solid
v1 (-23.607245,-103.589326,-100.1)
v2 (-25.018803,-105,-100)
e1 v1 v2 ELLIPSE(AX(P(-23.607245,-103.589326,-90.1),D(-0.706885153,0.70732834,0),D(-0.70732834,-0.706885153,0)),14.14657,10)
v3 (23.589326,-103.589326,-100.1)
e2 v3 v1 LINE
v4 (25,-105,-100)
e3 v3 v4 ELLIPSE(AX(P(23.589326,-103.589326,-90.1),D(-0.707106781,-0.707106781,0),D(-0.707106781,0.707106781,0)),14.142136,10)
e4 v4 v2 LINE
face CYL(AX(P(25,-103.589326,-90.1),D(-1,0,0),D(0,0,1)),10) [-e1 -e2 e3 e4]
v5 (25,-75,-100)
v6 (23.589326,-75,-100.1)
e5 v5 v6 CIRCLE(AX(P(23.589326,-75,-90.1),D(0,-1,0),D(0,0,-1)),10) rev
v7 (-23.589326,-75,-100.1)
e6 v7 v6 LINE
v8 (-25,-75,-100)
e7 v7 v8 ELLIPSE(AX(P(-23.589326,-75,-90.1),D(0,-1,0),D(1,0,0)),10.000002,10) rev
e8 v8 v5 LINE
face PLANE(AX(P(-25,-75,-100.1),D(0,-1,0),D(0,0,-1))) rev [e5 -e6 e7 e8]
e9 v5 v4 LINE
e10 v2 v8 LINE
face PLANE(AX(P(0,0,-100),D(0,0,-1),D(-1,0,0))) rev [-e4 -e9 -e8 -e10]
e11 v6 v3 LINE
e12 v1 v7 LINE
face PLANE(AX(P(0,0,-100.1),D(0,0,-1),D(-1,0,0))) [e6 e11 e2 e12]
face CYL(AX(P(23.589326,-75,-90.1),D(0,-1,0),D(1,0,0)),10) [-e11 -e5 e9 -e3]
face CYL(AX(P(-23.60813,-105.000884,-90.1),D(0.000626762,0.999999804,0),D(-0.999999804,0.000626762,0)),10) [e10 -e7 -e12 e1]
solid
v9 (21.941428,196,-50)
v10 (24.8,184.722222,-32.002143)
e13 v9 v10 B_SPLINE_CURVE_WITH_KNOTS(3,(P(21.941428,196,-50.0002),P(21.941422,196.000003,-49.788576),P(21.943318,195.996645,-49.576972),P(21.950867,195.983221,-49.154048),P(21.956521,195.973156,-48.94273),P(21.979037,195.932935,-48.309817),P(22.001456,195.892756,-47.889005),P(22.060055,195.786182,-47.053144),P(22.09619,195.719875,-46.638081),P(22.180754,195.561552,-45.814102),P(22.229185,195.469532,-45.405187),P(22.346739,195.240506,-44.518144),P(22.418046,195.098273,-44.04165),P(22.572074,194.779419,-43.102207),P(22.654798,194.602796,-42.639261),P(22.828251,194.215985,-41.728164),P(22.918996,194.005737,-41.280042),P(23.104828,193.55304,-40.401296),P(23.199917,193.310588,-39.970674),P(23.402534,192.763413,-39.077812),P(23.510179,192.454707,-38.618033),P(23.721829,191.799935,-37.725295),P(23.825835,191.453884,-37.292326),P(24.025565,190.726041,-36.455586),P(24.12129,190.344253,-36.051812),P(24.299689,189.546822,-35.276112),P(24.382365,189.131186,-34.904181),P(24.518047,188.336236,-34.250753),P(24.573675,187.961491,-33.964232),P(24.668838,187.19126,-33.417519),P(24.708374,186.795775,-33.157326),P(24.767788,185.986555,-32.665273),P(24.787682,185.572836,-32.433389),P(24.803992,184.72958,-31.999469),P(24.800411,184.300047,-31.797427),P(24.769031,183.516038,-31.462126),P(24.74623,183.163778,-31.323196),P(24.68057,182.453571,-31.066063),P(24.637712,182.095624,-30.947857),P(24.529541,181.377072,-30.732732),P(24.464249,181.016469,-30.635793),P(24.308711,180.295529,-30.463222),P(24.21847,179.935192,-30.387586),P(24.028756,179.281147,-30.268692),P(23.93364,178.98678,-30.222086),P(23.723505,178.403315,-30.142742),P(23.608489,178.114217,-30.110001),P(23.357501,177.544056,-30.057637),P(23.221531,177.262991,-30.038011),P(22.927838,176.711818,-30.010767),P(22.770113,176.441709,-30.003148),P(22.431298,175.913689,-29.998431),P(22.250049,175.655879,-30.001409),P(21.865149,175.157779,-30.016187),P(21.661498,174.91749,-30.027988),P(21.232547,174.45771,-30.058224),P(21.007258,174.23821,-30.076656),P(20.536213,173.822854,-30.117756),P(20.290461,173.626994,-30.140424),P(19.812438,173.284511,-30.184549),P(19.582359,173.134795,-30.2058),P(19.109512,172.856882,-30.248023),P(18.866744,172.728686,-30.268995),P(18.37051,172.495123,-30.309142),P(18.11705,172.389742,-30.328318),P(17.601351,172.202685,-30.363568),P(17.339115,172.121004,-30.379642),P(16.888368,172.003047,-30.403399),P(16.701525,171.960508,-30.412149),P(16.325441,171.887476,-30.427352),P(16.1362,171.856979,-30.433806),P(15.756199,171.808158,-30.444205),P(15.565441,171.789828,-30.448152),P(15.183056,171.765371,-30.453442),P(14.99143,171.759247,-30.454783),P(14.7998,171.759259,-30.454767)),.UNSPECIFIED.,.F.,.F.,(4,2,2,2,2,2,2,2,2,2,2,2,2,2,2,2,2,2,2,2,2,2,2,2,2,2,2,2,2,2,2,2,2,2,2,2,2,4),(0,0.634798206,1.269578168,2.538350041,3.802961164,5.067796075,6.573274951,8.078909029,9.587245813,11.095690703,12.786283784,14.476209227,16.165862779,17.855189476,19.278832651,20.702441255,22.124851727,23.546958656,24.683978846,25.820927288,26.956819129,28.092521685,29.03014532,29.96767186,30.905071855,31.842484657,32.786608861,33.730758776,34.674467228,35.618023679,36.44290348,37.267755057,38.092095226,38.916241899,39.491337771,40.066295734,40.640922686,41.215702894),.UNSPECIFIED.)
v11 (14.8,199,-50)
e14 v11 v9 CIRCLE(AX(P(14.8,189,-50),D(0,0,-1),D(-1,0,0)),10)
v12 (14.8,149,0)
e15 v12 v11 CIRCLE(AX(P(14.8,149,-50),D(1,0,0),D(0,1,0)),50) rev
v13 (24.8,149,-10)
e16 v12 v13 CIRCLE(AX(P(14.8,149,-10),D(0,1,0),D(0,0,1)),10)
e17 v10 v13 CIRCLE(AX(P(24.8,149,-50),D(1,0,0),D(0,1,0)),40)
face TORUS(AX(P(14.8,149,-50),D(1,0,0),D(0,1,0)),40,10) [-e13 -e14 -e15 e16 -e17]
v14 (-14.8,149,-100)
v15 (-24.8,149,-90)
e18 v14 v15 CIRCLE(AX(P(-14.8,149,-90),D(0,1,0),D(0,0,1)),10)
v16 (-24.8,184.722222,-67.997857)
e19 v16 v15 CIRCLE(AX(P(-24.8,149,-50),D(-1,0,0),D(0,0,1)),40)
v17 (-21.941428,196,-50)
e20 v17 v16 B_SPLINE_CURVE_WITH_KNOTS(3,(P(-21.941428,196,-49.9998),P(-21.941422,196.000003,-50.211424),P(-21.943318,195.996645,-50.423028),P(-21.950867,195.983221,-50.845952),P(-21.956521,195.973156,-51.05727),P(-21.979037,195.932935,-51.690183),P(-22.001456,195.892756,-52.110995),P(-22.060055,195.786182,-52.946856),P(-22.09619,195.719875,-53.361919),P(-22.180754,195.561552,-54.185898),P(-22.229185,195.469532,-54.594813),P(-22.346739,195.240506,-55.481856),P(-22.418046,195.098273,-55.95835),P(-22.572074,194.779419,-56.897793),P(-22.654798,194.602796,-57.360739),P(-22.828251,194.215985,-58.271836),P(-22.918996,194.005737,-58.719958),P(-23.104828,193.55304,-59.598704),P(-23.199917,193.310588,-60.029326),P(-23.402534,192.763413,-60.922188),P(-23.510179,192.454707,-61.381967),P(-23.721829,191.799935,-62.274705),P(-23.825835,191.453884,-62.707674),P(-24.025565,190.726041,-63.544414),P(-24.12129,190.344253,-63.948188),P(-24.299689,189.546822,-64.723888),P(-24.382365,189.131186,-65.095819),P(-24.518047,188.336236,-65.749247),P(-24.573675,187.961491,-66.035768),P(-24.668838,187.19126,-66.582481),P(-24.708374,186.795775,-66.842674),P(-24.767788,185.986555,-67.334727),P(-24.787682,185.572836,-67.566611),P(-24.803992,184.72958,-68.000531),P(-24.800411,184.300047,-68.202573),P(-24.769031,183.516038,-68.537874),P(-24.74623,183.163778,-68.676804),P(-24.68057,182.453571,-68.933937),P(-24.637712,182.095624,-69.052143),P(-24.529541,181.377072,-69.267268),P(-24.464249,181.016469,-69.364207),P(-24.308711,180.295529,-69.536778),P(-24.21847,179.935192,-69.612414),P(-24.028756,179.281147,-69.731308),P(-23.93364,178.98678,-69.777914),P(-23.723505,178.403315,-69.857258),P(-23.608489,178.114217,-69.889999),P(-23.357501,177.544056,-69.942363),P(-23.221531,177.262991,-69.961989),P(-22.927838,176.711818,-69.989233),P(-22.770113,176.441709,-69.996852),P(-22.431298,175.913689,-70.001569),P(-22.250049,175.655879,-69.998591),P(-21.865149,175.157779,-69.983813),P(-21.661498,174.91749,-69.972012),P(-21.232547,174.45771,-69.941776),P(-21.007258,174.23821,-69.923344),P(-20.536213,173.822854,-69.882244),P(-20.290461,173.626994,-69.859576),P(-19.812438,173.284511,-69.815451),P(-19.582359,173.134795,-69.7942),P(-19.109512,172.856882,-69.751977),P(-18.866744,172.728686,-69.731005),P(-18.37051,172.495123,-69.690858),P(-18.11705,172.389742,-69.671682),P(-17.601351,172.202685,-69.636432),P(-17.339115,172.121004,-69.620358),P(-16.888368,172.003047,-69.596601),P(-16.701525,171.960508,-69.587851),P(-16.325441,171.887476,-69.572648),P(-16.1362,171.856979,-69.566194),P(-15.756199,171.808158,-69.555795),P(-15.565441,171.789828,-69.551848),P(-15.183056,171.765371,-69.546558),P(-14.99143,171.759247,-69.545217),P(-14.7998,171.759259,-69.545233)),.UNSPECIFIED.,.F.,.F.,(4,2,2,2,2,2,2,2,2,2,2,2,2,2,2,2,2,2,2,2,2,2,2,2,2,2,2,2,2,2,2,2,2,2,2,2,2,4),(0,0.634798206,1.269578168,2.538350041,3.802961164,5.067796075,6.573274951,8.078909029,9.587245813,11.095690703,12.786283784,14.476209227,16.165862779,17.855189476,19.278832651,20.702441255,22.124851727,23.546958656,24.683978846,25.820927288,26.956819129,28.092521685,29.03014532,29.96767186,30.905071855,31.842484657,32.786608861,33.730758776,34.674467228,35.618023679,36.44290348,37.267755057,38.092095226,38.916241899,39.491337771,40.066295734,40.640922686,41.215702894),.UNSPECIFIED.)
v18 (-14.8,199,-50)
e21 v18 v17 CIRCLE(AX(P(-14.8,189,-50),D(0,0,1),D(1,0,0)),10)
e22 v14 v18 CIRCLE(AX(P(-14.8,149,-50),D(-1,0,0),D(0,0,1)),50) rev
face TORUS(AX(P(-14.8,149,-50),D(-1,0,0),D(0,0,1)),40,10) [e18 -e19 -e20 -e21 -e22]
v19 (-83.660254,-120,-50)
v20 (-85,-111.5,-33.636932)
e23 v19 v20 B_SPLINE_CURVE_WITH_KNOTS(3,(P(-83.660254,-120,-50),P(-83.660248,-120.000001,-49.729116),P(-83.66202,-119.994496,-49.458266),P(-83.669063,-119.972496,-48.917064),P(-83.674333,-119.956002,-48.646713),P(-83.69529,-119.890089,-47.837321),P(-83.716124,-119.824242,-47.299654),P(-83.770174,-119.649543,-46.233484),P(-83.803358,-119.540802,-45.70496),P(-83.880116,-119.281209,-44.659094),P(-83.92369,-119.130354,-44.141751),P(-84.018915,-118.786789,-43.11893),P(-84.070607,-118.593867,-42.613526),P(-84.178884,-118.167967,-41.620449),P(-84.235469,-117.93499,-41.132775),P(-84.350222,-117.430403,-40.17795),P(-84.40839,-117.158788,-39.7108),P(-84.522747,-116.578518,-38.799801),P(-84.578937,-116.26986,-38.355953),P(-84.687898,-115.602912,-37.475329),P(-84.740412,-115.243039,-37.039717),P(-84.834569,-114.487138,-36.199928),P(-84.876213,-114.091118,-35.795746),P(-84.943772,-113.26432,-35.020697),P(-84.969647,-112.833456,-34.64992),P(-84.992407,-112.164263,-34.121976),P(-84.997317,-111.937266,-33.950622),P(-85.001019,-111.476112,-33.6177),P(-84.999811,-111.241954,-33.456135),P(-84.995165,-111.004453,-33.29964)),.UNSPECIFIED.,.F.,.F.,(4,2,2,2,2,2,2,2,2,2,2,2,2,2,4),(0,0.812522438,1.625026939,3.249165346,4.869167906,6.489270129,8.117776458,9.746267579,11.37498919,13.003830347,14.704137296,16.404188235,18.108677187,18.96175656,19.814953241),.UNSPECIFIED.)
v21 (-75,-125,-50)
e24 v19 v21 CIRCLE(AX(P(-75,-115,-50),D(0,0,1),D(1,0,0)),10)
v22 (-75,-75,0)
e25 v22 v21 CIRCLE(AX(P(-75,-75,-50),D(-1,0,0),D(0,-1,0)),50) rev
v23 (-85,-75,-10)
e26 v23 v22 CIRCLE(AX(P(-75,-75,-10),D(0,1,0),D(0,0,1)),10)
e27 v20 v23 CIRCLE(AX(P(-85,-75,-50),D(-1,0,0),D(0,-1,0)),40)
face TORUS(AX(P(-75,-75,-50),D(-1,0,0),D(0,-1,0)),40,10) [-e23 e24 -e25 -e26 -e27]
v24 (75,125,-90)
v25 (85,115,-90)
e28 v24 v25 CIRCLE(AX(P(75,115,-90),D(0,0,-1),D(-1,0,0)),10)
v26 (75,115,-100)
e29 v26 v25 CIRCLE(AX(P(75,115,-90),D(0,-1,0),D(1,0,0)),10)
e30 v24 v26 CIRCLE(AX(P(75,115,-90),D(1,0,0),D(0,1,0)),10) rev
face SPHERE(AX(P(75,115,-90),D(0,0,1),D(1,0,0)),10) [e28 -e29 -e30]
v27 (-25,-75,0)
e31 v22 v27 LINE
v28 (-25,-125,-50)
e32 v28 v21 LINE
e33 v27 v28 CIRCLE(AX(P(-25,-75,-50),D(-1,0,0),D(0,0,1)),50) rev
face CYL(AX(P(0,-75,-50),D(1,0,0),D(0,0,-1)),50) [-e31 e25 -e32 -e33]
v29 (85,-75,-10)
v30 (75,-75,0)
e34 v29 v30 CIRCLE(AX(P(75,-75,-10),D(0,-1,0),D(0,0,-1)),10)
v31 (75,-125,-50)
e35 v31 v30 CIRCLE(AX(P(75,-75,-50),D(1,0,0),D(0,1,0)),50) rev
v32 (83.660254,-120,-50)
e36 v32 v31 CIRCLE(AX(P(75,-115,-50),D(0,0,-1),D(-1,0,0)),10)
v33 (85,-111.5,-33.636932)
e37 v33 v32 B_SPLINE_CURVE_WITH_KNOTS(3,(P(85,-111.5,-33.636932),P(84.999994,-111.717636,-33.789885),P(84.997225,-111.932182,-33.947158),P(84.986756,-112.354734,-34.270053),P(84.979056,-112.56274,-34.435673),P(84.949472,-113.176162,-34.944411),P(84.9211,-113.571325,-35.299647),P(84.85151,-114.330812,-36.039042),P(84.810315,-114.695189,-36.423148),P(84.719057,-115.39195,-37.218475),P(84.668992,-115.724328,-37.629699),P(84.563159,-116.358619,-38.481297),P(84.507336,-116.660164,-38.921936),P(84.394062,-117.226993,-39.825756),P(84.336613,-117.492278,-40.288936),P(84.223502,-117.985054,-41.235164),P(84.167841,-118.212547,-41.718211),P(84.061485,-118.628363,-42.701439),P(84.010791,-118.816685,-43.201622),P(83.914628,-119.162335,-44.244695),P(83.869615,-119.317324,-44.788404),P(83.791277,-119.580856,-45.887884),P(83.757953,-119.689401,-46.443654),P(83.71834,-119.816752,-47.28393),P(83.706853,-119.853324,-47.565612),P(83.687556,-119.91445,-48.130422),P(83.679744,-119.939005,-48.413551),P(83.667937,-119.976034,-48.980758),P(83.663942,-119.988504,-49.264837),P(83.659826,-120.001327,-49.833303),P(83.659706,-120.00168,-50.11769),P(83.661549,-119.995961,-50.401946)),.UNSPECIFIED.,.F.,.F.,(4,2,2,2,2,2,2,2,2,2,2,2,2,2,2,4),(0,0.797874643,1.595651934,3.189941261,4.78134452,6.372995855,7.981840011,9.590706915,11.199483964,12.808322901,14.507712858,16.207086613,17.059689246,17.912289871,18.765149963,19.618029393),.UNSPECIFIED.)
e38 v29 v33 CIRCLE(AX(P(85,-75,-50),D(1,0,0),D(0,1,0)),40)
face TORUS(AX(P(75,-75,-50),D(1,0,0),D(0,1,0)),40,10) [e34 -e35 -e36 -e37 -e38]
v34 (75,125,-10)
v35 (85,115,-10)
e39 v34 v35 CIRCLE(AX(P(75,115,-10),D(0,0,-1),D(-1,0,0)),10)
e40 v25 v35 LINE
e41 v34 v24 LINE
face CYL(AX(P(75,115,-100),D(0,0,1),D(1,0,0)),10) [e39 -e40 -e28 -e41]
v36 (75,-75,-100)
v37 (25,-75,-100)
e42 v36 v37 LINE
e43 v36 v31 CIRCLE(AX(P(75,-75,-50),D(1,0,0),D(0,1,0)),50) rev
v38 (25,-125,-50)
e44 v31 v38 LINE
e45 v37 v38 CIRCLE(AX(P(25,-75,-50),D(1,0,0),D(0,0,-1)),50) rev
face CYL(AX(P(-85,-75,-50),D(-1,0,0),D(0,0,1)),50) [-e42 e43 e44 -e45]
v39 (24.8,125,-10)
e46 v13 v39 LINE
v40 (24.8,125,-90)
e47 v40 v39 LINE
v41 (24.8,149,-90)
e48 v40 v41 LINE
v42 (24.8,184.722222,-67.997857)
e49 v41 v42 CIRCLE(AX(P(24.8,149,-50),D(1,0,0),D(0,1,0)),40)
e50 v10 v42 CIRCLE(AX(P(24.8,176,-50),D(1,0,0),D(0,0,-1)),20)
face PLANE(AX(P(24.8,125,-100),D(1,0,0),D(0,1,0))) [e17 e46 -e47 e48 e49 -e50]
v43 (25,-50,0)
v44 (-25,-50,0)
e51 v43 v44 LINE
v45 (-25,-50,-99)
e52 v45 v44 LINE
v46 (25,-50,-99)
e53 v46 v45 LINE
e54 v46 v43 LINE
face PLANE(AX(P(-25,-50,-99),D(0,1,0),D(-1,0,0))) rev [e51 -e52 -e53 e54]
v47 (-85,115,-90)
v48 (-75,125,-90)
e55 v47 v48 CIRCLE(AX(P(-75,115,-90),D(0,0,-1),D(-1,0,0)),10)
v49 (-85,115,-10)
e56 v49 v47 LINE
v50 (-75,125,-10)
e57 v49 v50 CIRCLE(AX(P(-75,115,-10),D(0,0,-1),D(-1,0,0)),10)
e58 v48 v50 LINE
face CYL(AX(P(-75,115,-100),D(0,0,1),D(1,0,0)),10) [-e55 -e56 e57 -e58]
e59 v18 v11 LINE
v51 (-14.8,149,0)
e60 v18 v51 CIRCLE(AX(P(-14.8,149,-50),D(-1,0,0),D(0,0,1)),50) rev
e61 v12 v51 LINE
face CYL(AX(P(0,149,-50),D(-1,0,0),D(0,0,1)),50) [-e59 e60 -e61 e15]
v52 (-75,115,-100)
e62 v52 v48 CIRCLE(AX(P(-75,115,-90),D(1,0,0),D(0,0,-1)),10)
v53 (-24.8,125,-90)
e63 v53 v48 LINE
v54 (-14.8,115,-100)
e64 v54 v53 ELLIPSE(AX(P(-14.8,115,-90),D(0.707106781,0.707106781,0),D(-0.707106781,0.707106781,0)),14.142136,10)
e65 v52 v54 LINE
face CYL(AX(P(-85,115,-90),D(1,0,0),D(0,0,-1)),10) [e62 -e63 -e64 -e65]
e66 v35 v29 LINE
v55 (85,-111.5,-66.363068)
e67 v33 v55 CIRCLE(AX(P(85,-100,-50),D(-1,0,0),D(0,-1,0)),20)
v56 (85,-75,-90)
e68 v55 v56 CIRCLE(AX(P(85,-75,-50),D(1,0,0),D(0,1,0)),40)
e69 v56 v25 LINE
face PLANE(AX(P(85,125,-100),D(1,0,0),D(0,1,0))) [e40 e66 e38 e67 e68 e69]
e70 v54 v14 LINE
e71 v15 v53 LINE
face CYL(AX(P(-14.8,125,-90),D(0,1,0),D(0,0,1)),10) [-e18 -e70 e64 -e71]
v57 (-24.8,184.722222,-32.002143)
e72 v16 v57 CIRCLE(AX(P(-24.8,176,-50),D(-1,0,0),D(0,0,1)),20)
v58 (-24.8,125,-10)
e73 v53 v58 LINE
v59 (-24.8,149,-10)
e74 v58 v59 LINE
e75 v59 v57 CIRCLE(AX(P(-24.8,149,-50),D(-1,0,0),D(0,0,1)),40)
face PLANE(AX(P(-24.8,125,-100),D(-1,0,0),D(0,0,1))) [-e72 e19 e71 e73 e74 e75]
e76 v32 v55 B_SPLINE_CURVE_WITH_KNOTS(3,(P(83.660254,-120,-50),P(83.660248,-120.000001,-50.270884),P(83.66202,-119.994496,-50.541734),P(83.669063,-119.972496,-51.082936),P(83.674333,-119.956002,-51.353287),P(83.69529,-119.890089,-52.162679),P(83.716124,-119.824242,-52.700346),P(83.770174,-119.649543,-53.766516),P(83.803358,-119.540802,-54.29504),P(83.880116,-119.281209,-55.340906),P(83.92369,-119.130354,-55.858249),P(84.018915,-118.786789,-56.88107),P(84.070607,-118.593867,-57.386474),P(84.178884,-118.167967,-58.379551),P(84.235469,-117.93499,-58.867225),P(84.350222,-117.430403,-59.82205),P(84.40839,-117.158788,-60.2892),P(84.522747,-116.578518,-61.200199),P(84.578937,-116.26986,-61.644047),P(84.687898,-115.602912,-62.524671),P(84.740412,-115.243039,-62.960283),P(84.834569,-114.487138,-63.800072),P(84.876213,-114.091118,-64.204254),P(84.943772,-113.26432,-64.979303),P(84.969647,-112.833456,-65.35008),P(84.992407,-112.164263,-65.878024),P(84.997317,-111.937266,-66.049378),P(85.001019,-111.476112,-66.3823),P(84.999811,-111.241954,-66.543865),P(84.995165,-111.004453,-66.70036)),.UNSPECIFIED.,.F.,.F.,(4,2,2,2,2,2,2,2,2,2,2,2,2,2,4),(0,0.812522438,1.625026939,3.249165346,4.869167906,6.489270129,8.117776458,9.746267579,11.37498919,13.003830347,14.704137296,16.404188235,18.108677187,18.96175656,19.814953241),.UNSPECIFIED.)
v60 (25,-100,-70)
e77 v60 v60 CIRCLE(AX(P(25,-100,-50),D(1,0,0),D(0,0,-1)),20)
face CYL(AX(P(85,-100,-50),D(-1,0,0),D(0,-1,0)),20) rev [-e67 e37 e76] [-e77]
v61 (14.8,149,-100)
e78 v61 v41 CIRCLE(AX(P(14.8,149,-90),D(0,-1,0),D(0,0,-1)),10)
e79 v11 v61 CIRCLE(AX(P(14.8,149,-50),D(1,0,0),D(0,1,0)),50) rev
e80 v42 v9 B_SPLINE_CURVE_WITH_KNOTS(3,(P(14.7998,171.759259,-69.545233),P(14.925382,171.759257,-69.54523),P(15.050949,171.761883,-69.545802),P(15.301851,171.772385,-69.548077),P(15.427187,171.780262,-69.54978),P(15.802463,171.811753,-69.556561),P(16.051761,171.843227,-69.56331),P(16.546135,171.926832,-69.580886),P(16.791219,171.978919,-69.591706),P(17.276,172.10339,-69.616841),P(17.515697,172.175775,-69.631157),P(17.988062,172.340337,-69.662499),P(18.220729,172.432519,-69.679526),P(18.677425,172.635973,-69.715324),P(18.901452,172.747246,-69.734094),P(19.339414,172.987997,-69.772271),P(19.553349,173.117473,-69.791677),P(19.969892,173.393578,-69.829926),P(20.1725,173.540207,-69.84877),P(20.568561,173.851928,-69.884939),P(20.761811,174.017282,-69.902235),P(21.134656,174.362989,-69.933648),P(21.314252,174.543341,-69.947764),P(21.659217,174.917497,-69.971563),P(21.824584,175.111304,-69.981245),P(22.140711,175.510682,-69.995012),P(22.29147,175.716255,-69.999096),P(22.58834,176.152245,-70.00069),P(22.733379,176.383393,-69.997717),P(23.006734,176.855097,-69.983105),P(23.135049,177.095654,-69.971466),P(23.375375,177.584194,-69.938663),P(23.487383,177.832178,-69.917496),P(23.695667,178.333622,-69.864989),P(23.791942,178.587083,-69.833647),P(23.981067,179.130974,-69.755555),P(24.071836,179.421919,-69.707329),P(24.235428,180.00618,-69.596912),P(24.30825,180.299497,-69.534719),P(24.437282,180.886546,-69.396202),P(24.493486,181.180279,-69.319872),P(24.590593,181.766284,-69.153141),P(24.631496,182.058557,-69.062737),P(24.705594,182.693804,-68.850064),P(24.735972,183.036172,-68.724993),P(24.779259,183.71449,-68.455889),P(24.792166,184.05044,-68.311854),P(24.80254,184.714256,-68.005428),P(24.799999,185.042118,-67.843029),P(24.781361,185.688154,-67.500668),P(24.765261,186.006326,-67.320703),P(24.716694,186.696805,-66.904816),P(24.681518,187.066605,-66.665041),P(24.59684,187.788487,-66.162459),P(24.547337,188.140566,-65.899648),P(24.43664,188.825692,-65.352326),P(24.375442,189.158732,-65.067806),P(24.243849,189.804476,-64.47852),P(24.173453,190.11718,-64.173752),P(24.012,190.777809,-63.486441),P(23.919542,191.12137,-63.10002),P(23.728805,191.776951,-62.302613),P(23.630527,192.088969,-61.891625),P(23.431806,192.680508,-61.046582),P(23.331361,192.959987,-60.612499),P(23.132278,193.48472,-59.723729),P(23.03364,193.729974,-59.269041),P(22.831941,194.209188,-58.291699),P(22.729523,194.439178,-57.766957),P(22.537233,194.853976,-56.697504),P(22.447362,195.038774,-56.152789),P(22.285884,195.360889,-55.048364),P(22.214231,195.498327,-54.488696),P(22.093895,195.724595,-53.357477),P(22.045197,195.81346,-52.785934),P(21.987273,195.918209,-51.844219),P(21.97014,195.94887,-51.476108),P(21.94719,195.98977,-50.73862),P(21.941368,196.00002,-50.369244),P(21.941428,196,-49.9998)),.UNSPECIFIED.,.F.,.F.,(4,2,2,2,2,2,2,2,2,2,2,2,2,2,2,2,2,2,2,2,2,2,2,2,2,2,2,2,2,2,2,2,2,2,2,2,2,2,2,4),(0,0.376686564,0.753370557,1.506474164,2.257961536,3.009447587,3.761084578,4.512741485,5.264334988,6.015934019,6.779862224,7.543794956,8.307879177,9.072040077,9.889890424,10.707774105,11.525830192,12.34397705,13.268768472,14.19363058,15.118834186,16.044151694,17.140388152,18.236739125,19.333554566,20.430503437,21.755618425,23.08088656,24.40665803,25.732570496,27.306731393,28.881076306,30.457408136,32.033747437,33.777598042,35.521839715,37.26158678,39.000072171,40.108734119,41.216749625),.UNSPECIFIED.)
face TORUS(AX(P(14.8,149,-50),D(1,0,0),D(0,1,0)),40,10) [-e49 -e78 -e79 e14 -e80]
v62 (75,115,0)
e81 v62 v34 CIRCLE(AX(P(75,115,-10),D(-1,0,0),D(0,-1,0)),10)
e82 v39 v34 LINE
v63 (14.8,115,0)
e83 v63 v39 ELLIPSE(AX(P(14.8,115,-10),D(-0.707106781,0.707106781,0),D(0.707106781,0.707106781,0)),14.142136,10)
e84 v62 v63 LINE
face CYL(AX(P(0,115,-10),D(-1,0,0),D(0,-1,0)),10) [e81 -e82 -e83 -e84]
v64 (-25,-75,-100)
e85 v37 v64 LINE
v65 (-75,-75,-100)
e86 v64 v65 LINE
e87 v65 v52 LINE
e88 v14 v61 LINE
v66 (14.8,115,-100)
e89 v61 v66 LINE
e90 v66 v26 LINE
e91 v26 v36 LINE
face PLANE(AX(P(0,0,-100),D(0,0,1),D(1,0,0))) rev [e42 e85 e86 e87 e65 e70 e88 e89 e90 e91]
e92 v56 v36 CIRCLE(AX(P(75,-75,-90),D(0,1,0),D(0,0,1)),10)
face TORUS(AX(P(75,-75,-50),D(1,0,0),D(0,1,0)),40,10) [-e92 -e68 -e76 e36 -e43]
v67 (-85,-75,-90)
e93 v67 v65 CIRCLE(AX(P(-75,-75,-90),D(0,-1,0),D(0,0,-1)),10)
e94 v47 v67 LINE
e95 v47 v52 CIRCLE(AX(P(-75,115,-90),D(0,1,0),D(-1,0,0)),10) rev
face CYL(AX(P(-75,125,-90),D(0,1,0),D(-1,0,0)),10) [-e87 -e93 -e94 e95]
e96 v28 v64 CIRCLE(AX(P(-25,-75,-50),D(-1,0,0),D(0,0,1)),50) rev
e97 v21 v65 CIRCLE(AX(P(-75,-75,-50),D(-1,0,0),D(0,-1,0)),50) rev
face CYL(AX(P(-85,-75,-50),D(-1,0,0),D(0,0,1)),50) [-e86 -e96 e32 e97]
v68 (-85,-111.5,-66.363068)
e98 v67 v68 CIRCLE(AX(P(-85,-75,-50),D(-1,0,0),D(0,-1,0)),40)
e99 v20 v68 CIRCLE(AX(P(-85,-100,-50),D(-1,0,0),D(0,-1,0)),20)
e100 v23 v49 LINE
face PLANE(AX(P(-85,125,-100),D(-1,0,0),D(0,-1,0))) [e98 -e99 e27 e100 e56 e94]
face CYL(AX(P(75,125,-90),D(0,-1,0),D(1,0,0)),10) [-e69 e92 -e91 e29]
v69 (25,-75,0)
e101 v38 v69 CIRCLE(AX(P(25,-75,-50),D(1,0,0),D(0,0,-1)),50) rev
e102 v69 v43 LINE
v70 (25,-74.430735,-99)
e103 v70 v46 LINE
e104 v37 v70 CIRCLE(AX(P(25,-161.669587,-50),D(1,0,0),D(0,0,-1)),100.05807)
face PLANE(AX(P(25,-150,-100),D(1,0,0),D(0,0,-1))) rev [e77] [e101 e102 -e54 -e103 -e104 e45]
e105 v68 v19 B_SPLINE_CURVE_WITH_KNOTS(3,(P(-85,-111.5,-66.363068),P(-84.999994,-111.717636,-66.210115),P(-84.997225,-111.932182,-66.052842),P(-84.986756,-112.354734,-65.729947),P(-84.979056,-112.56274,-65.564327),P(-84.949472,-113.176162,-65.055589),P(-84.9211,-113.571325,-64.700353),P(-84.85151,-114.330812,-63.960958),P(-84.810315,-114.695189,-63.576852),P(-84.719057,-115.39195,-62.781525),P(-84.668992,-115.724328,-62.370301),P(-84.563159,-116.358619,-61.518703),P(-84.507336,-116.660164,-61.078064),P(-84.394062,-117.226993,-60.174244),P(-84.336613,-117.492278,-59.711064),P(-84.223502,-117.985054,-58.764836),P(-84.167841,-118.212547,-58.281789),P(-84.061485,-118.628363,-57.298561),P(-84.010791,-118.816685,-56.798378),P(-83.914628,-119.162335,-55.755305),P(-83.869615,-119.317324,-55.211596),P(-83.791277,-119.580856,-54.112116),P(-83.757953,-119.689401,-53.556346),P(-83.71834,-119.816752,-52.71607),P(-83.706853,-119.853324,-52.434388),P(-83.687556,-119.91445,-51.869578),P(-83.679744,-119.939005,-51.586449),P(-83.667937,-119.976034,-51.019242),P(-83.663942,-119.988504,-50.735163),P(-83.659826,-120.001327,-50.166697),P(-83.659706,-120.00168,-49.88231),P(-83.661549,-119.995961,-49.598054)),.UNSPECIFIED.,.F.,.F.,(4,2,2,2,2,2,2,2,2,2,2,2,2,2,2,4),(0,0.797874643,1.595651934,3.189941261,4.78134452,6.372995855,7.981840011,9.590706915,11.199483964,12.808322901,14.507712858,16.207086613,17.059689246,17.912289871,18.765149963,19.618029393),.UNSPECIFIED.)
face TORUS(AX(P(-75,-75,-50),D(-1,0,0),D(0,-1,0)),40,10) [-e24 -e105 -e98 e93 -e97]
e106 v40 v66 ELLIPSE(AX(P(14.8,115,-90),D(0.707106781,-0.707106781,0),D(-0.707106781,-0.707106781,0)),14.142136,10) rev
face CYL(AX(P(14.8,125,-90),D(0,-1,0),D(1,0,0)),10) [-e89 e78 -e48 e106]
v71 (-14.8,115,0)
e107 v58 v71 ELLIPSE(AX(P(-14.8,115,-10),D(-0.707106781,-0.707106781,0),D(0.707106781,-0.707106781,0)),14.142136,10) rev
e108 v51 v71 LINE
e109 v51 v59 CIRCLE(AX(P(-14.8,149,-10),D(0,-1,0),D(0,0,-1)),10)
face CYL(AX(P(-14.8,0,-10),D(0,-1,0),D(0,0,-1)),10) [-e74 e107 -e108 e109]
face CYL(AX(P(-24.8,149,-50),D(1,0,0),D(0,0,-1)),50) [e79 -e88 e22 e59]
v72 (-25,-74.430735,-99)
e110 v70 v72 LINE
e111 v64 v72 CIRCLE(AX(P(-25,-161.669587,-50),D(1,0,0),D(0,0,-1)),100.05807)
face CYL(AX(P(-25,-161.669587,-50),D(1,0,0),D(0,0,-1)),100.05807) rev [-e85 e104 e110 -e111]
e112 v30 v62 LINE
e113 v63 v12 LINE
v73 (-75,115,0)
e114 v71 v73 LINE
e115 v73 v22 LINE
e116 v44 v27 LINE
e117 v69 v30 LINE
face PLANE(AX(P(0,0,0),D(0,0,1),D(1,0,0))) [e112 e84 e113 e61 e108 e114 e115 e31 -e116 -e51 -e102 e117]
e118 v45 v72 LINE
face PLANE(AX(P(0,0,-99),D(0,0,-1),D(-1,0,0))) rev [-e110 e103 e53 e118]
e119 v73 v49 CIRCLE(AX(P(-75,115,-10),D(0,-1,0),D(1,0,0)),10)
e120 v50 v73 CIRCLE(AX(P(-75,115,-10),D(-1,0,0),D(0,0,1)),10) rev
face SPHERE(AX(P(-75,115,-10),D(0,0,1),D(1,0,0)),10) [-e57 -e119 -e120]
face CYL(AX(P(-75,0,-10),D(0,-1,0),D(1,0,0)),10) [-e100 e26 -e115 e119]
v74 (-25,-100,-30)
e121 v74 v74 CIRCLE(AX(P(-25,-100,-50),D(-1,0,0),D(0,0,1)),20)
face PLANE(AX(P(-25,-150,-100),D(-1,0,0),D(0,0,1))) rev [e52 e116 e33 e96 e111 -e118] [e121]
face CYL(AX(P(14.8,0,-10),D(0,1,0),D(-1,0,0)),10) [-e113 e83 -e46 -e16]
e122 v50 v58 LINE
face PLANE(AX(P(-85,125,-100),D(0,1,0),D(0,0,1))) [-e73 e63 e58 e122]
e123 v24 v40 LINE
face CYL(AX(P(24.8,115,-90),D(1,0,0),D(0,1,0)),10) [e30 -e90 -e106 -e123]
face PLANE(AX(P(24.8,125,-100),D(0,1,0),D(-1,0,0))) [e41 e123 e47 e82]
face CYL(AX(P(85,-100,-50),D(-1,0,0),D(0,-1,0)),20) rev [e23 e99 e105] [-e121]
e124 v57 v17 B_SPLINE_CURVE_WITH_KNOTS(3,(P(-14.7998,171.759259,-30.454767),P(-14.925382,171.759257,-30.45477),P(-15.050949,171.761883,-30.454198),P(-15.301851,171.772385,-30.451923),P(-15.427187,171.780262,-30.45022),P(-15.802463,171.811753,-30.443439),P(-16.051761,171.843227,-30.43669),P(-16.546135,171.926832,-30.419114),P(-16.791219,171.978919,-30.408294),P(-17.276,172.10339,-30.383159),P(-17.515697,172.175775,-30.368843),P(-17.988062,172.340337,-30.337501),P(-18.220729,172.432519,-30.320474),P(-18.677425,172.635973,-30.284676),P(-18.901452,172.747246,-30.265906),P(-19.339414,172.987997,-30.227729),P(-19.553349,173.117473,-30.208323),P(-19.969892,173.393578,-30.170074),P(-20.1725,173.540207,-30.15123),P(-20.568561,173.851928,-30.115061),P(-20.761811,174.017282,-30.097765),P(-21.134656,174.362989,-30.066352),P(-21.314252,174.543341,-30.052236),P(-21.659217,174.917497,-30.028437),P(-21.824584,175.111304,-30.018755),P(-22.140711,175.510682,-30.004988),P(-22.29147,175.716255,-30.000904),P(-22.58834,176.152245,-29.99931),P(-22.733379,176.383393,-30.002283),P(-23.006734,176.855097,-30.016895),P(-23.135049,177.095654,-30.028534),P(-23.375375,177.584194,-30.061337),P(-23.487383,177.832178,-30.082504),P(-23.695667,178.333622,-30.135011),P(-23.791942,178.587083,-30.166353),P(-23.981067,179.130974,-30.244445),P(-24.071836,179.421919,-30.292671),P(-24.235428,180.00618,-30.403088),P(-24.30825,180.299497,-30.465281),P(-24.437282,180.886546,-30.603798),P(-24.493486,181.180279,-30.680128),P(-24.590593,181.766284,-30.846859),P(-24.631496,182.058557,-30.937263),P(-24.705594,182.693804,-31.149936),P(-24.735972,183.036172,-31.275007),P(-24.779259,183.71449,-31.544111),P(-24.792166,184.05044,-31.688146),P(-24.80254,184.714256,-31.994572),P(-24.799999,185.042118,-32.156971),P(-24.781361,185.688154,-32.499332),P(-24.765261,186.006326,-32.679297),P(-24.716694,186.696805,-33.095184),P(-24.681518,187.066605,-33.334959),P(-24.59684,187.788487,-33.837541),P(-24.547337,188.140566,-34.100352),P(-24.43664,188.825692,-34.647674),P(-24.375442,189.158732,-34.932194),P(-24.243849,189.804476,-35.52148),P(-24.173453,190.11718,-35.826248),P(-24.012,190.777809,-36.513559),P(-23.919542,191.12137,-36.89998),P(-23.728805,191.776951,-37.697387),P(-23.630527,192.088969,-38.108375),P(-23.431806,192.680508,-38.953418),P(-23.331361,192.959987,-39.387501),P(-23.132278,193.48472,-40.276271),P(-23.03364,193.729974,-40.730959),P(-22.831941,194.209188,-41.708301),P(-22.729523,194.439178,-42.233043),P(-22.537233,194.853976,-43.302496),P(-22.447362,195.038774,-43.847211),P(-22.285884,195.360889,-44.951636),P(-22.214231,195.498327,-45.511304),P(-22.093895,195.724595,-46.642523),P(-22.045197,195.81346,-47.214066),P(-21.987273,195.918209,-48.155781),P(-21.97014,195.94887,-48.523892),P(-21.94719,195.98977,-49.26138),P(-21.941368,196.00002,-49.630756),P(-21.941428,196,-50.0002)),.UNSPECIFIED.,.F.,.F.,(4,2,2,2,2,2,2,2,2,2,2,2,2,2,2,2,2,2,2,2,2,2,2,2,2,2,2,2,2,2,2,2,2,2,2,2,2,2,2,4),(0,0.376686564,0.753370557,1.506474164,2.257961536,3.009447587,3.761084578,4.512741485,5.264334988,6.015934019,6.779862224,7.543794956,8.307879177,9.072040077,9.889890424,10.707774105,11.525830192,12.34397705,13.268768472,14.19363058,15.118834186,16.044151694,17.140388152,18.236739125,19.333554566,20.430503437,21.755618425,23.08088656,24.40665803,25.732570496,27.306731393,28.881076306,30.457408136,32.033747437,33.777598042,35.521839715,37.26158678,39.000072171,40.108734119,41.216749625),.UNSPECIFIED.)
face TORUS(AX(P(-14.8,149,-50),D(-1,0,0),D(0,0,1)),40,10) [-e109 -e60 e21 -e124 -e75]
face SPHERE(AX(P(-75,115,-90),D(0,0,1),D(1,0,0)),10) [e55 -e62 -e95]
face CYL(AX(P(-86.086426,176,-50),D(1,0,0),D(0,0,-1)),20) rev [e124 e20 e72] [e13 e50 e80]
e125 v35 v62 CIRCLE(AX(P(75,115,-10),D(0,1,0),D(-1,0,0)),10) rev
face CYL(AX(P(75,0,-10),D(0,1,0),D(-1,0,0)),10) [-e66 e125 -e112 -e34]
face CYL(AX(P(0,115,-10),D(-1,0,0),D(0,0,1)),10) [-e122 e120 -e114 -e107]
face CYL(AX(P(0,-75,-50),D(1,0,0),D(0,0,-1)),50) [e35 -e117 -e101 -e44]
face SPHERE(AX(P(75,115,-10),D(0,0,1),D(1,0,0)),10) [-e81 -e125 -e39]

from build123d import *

# Parameters (mm, degrees)
BOSS_EXTRUDE1_DEPTH    = 100
SKETCH2_W              = 50
SKETCH2_H              = 50
CUT_EXTRUDE1_DEPTH     = 239.382046304
FILLET1_R              = 50
CUT_EXTRUDE2_DEPTH     = 25
SKETCH7_R              = 20
CUT_EXTRUDE3_DEPTH     = 281.180299093
FILLET2_R              = 50
CUT_EXTRUDE6_START     = -125
CUT_EXTRUDE6_OUTLINE_W = 50
CUT_EXTRUDE6_OUTLINE_H = 6.698729811
CUT_EXTRUDE6_DEPTH     = 50
CUT_EXTRUDE7_DEPTH     = 25
FILLET3_R              = 10
SKETCH11_W             = 50
SKETCH11_H             = 25
CUT_EXTRUDE8_DEPTH     = 99
BOSS_EXTRUDE7_DEPTH    = 0.1
FILLET4_R              = 10
FILLET5_R              = 10
SKETCH14_R             = 20
CUT_EXTRUDE9_DEPTH     = 249.348646185


with BuildPart() as part:
    # Sketch1 → Boss-Extrude1 (new body)
    with BuildSketch(Plane.XY):
        Polygon((-24.8, 125), (-24.8, 199), (24.8, 199), (24.8, 125), (85, 125), (85, -125), (-85, -125), (-85, 125), align=None)
    extrude(amount=-BOSS_EXTRUDE1_DEPTH)

    # Sketch2 → Cut-Extrude1 (cut, through all)
    with BuildSketch(Plane.XY):
        with Locations((0, -125)):
            Rectangle(SKETCH2_W, SKETCH2_H)
    extrude(amount=-CUT_EXTRUDE1_DEPTH, mode=Mode.SUBTRACT)

    # Fillet1
    fillet1_edges = [part.edges().sort_by_distance(p)[0] for p in [
        (0, 199, -100),
        (0, 199, 0),
    ]]
    fillet(fillet1_edges, radius=FILLET1_R - 0.0001)  # a hair under: the kernel refuses the full size

    # Sketch6 → Cut-Extrude2 (cut, symmetric)
    with BuildSketch(Plane(origin=(0, 0, 0), x_dir=(0, 0, -1), z_dir=(1, 0, 0))):
        with BuildLine():
            Line((100, -100), (0, -100))
            ThreePointArc((0, -100), (50, -50), (100, -100))
        make_face()
    extrude(amount=CUT_EXTRUDE2_DEPTH, both=True, mode=Mode.SUBTRACT)

    # Sketch7 → Cut-Extrude3 (cut, through all)
    with BuildSketch(Plane.ZY.offset(85)):
        with Locations(Location((-50, -100, 0), (0, 0, 270))):
            Circle(SKETCH7_R)
    extrude(amount=-CUT_EXTRUDE3_DEPTH, mode=Mode.SUBTRACT)

    # Fillet2
    fillet2_edges = [part.edges().sort_by_distance(p)[0] for p in [
        (-55, -125, -100),
        (-55, -125, 0),
    ]]
    fillet(fillet2_edges, radius=FILLET2_R - 0.0001)  # a hair under: the kernel refuses the full size

    # Cut-Extrude6: read off the stored shape, not the designer's step
    # Cut-Extrude6 outline → Cut-Extrude6 (cut)
    with BuildSketch(Plane(origin=(0, 0, 0), x_dir=(1, 0, 0), z_dir=(0, 1, 0)).offset(CUT_EXTRUDE6_START)):
        with Locations((0, 96.650635095)):
            Rectangle(CUT_EXTRUDE6_OUTLINE_W, CUT_EXTRUDE6_OUTLINE_H)
        with Locations((0, 3.349364906)):
            Rectangle(CUT_EXTRUDE6_OUTLINE_W, CUT_EXTRUDE6_OUTLINE_H)
    extrude(amount=CUT_EXTRUDE6_DEPTH, mode=Mode.SUBTRACT)

    # Sketch10 → Cut-Extrude7 (cut, symmetric)
    with BuildSketch(Plane(origin=(0, 0, 0), x_dir=(0, 0, -1), z_dir=(1, 0, 0))):
        with BuildLine():
            Line((0, -75), (100, -75))
            ThreePointArc((100, -75), (50, -61.611517322), (0, -75))
        make_face()
    extrude(amount=CUT_EXTRUDE7_DEPTH, both=True, mode=Mode.SUBTRACT)

    # Fillet3
    # the kernel refuses this fillet: 10 mm, written as the material it takes off along each edge
    with BuildSketch(Plane(origin=(24.8, 149.0001, -100), x_dir=(0, 0, 1), z_dir=(0, -1, 0)), Plane(origin=(-24.8, 125, 0), x_dir=(1, 0, 0), z_dir=(0, 1, 0)), Plane(origin=(-24.8, 125, -100), x_dir=(0, 0, 1), z_dir=(0, 1, 0)), Plane(origin=(24.8, 149.0001, 0), x_dir=(-1, 0, 0), z_dir=(0, -1, 0))) as fillet3_piece_1:
        with BuildLine():
            CenterArc((FILLET3_R, FILLET3_R), FILLET3_R, 180, 90)
            Line((0, FILLET3_R), (0, 0))
            Line((0, 0), (FILLET3_R, 0))
        make_face()
    extrude(amount=24.0001, mode=Mode.SUBTRACT)
    with BuildSketch(Plane(origin=(24.8, 125, 0), x_dir=(0, -1, 0), z_dir=(1, 0, 0)), Plane(origin=(-110, 125, -100), x_dir=(0, 0, 1), z_dir=(1, 0, 0)), Plane(origin=(24.8, 125, -100), x_dir=(0, 0, 1), z_dir=(1, 0, 0)), Plane(origin=(-110, 125, 0), x_dir=(0, -1, 0), z_dir=(1, 0, 0))) as fillet3_piece_2:
        with BuildLine():
            CenterArc((FILLET3_R, FILLET3_R), FILLET3_R, 180, 90)
            Line((0, FILLET3_R), (0, 0))
            Line((0, 0), (FILLET3_R, 0))
        make_face()
    extrude(amount=85.2, mode=Mode.SUBTRACT)
    with BuildSketch(Plane(origin=(-85, -75.0001, -100), x_dir=(0, 0, 1), z_dir=(0, 1, 0)), Plane(origin=(85, 150, 0), x_dir=(-1, 0, 0), z_dir=(0, -1, 0)), Plane(origin=(85, 150, -100), x_dir=(0, 0, 1), z_dir=(0, -1, 0)), Plane(origin=(-85, -75.0001, 0), x_dir=(1, 0, 0), z_dir=(0, 1, 0))) as fillet3_piece_3:
        with BuildLine():
            CenterArc((FILLET3_R, FILLET3_R), FILLET3_R, 180, 90)
            Line((0, FILLET3_R), (0, 0))
            Line((0, 0), (FILLET3_R, 0))
        make_face()
    extrude(amount=225.0001, mode=Mode.SUBTRACT)
    with BuildSketch(Plane(origin=(-24.8, 149.0001, -49.9999), x_dir=(0, 1, 0), z_dir=(0, 0, -1))) as fillet3_piece_4:
        with BuildLine():
            CenterArc((49.9999 - FILLET3_R, FILLET3_R), FILLET3_R, 270, 90)
            Line((49.9999 - FILLET3_R, 0), (49.9999, 0))
            Line((49.9999, 0), (49.9999, FILLET3_R))
        make_face()
    revolve(axis=Axis((-24.8, 149.0001, -49.9999), (1, 0, 0)), revolution_arc=90, mode=Mode.SUBTRACT)
    with BuildSketch(Plane(origin=(-24.8, 149.0001, -50.0001), x_dir=(0, 1, 0), z_dir=(0, 0, 1))) as fillet3_piece_5:
        with BuildLine():
            CenterArc((49.9999 - FILLET3_R, -FILLET3_R), FILLET3_R, 0, 90)
            Line((49.9999, -FILLET3_R), (49.9999, 0))
            Line((49.9999, 0), (49.9999 - FILLET3_R, 0))
        make_face()
    revolve(axis=Axis((-24.8, 149.0001, -50.0001), (-1, 0, 0)), revolution_arc=90, mode=Mode.SUBTRACT)
    with BuildSketch(Plane(origin=(24.8, 149.0001, -49.9999), x_dir=(0, 1, 0), z_dir=(0, 0, -1))) as fillet3_piece_6:
        with BuildLine():
            CenterArc((49.9999 - FILLET3_R, -FILLET3_R), FILLET3_R, 0, 90)
            Line((49.9999, -FILLET3_R), (49.9999, 0))
            Line((49.9999, 0), (49.9999 - FILLET3_R, 0))
        make_face()
    revolve(axis=Axis((24.8, 149.0001, -49.9999), (1, 0, 0)), revolution_arc=90, mode=Mode.SUBTRACT)
    with BuildSketch(Plane(origin=(24.8, 149.0001, -50.0001), x_dir=(0, 1, 0), z_dir=(0, 0, 1))) as fillet3_piece_7:
        with BuildLine():
            CenterArc((49.9999 - FILLET3_R, FILLET3_R), FILLET3_R, 270, 90)
            Line((49.9999, FILLET3_R), (49.9999, 0))
            Line((49.9999, 0), (49.9999 - FILLET3_R, 0))
        make_face()
    revolve(axis=Axis((24.8, 149.0001, -50.0001), (-1, 0, 0)), revolution_arc=90, mode=Mode.SUBTRACT)
    with BuildSketch(Plane(origin=(85, -75.0001, -49.9999), x_dir=(0, 0, 1), z_dir=(0, 1, 0))) as fillet3_piece_8:
        with BuildLine():
            CenterArc((49.9999 - FILLET3_R, -FILLET3_R), FILLET3_R, 360, 90)
            Line((49.9999, -FILLET3_R), (49.9999, 0))
            Line((49.9999, 0), (49.9999 - FILLET3_R, 0))
        make_face()
    revolve(axis=Axis((85, -75.0001, -49.9999), (1, 0, 0)), revolution_arc=90, mode=Mode.SUBTRACT)
    with BuildSketch(Plane(origin=(85, -75.0001, -50.0001), x_dir=(0, 0, -1), z_dir=(0, 1, 0))) as fillet3_piece_9:
        with BuildLine():
            CenterArc((49.9999 - FILLET3_R, FILLET3_R), FILLET3_R, 270, 90)
            Line((49.9999, FILLET3_R), (49.9999, 0))
            Line((49.9999, 0), (49.9999 - FILLET3_R, 0))
        make_face()
    revolve(axis=Axis((85, -75.0001, -50.0001), (-1, 0, 0)), revolution_arc=90, mode=Mode.SUBTRACT)
    with BuildSketch(Plane(origin=(-85, -75.0001, -49.9999), x_dir=(0, 0, 1), z_dir=(0, 1, 0))) as fillet3_piece_10:
        with BuildLine():
            CenterArc((49.9999 - FILLET3_R, FILLET3_R), FILLET3_R, 270, 90)
            Line((49.9999, FILLET3_R), (49.9999, 0))
            Line((49.9999, 0), (49.9999 - FILLET3_R, 0))
        make_face()
    revolve(axis=Axis((-85, -75.0001, -49.9999), (1, 0, 0)), revolution_arc=90, mode=Mode.SUBTRACT)
    with BuildSketch(Plane(origin=(-85, -75.0001, -50.0001), x_dir=(0, 0, -1), z_dir=(0, 1, 0))) as fillet3_piece_11:
        with BuildLine():
            CenterArc((49.9999 - FILLET3_R, -FILLET3_R), FILLET3_R, 0, 90)
            Line((49.9999, -FILLET3_R), (49.9999, 0))
            Line((49.9999, 0), (49.9999 - FILLET3_R, 0))
        make_face()
    revolve(axis=Axis((-85, -75.0001, -50.0001), (-1, 0, 0)), revolution_arc=90, mode=Mode.SUBTRACT)
    with BuildSketch(Plane(origin=(-85, -125, -49.9999), x_dir=(0, 1, 0), z_dir=(0, 0, -1)), Plane(origin=(24.8, 199, -49.9999), x_dir=(0, -1, 0), z_dir=(0, 0, -1))) as fillet3_piece_12:
        with BuildLine():
            CenterArc((FILLET3_R, FILLET3_R), FILLET3_R, 180, 90)
            Line((0, FILLET3_R), (0, 0))
            Line((0, 0), (FILLET3_R, 0))
        make_face()
    extrude(amount=0.0002, mode=Mode.SUBTRACT)
    with BuildSketch(Plane(origin=(85, -125, -49.9999), x_dir=(0, 1, 0), z_dir=(0, 0, -1)), Plane(origin=(-24.8, 199, -49.9999), x_dir=(0, -1, 0), z_dir=(0, 0, -1))) as fillet3_piece_13:
        with BuildLine():
            CenterArc((FILLET3_R, -FILLET3_R), FILLET3_R, 90, 90)
            Line((0, -FILLET3_R), (0, 0))
            Line((0, 0), (FILLET3_R, 0))
        make_face()
    extrude(amount=0.0002, mode=Mode.SUBTRACT)
    with BuildSketch(Plane(origin=(-0.2, 125, -100), x_dir=(0, 0, 1), z_dir=(1, 0, 0))) as fillet3_piece_14a_section:
        with BuildLine():
            CenterArc((FILLET3_R, FILLET3_R), FILLET3_R, 180, 90)
            Line((0, FILLET3_R), (0, 0))
            Line((0, 0), (FILLET3_R, 0))
        make_face()
    fillet3_piece_14a = extrude(amount=110.2, mode=Mode.PRIVATE)
    fillet3_piece_14a = split(fillet3_piece_14a, bisect_by=Plane(origin=(24.8, 125, -100), z_dir=(-1, 0, 0)), keep=Keep.TOP, mode=Mode.PRIVATE)
    with BuildSketch(Plane(origin=(24.8, 149.0001, -100), x_dir=(0, 0, 1), z_dir=(0, -1, 0))) as fillet3_piece_14b_section:
        with BuildLine():
            CenterArc((FILLET3_R, FILLET3_R), FILLET3_R, 180, 90)
            Line((0, FILLET3_R), (0, 0))
            Line((0, 0), (FILLET3_R, 0))
        make_face()
    fillet3_piece_14b = extrude(amount=49.0001, mode=Mode.PRIVATE)
    fillet3_piece_14b = split(fillet3_piece_14b, bisect_by=Plane(origin=(24.8, 125, -100), z_dir=(0, -1, 0)), keep=Keep.TOP, mode=Mode.PRIVATE)
    fillet3_piece_14 = fillet3_piece_14a & fillet3_piece_14b
    add(fillet3_piece_14, mode=Mode.SUBTRACT)
    with BuildSketch(Plane(origin=(-0.2, 125, 0), x_dir=(0, -1, 0), z_dir=(1, 0, 0))) as fillet3_piece_15a_section:
        with BuildLine():
            CenterArc((FILLET3_R, FILLET3_R), FILLET3_R, 180, 90)
            Line((0, FILLET3_R), (0, 0))
            Line((0, 0), (FILLET3_R, 0))
        make_face()
    fillet3_piece_15a = extrude(amount=110.2, mode=Mode.PRIVATE)
    fillet3_piece_15a = split(fillet3_piece_15a, bisect_by=Plane(origin=(24.8, 125, 0), z_dir=(-1, 0, 0)), keep=Keep.TOP, mode=Mode.PRIVATE)
    with BuildSketch(Plane(origin=(24.8, 149.0001, 0), x_dir=(-1, 0, 0), z_dir=(0, -1, 0))) as fillet3_piece_15b_section:
        with BuildLine():
            CenterArc((FILLET3_R, FILLET3_R), FILLET3_R, 180, 90)
            Line((0, FILLET3_R), (0, 0))
            Line((0, 0), (FILLET3_R, 0))
        make_face()
    fillet3_piece_15b = extrude(amount=49.0001, mode=Mode.PRIVATE)
    fillet3_piece_15b = split(fillet3_piece_15b, bisect_by=Plane(origin=(24.8, 125, 0), z_dir=(0, -1, 0)), keep=Keep.TOP, mode=Mode.PRIVATE)
    fillet3_piece_15 = fillet3_piece_15a & fillet3_piece_15b
    add(fillet3_piece_15, mode=Mode.SUBTRACT)
    with BuildSketch(Plane(origin=(-24.8, 100, -100), x_dir=(0, 0, 1), z_dir=(0, 1, 0))) as fillet3_piece_16a_section:
        with BuildLine():
            CenterArc((FILLET3_R, FILLET3_R), FILLET3_R, 180, 90)
            Line((0, FILLET3_R), (0, 0))
            Line((0, 0), (FILLET3_R, 0))
        make_face()
    fillet3_piece_16a = extrude(amount=49.0001, mode=Mode.PRIVATE)
    fillet3_piece_16a = split(fillet3_piece_16a, bisect_by=Plane(origin=(-24.8, 125, -100), z_dir=(0, -1, 0)), keep=Keep.TOP, mode=Mode.PRIVATE)
    with BuildSketch(Plane(origin=(-110, 125, -100), x_dir=(0, 0, 1), z_dir=(1, 0, 0))) as fillet3_piece_16b_section:
        with BuildLine():
            CenterArc((FILLET3_R, FILLET3_R), FILLET3_R, 180, 90)
            Line((0, FILLET3_R), (0, 0))
            Line((0, 0), (FILLET3_R, 0))
        make_face()
    fillet3_piece_16b = extrude(amount=110.2, mode=Mode.PRIVATE)
    fillet3_piece_16b = split(fillet3_piece_16b, bisect_by=Plane(origin=(-24.8, 125, -100), z_dir=(1, 0, 0)), keep=Keep.TOP, mode=Mode.PRIVATE)
    fillet3_piece_16 = fillet3_piece_16a & fillet3_piece_16b
    add(fillet3_piece_16, mode=Mode.SUBTRACT)
    with BuildSketch(Plane(origin=(-24.8, 100, 0), x_dir=(1, 0, 0), z_dir=(0, 1, 0))) as fillet3_piece_17a_section:
        with BuildLine():
            CenterArc((FILLET3_R, FILLET3_R), FILLET3_R, 180, 90)
            Line((0, FILLET3_R), (0, 0))
            Line((0, 0), (FILLET3_R, 0))
        make_face()
    fillet3_piece_17a = extrude(amount=49.0001, mode=Mode.PRIVATE)
    fillet3_piece_17a = split(fillet3_piece_17a, bisect_by=Plane(origin=(-24.8, 125, 0), z_dir=(0, -1, 0)), keep=Keep.TOP, mode=Mode.PRIVATE)
    with BuildSketch(Plane(origin=(-110, 125, 0), x_dir=(0, -1, 0), z_dir=(1, 0, 0))) as fillet3_piece_17b_section:
        with BuildLine():
            CenterArc((FILLET3_R, FILLET3_R), FILLET3_R, 180, 90)
            Line((0, FILLET3_R), (0, 0))
            Line((0, 0), (FILLET3_R, 0))
        make_face()
    fillet3_piece_17b = extrude(amount=110.2, mode=Mode.PRIVATE)
    fillet3_piece_17b = split(fillet3_piece_17b, bisect_by=Plane(origin=(-24.8, 125, 0), z_dir=(1, 0, 0)), keep=Keep.TOP, mode=Mode.PRIVATE)
    fillet3_piece_17 = fillet3_piece_17a & fillet3_piece_17b
    add(fillet3_piece_17, mode=Mode.SUBTRACT)

    # Sketch11 → Cut-Extrude8 (cut)
    with BuildSketch(Plane.XY):
        with Locations((0, -62.5)):
            Rectangle(SKETCH11_W, SKETCH11_H)
    extrude(amount=-CUT_EXTRUDE8_DEPTH, mode=Mode.SUBTRACT)

    # Fillet5
    # the kernel refuses this fillet: 10 mm, written as the material it takes off along each edge
    with BuildSketch(Plane(origin=(75, 115, -10), x_dir=(0, 1, 0), z_dir=(1, 0, 0))) as fillet5_piece_1_section:
        Polygon((0, 0), (FILLET5_R, 0), (FILLET5_R, FILLET5_R), (0, FILLET5_R), align=None)
    fillet5_piece_1 = extrude(amount=FILLET5_R, mode=Mode.PRIVATE)
    fillet5_piece_1 = fillet5_piece_1 - Plane(origin=(75, 115, -10), x_dir=(0, -0.7071067811865475, -0.7071067811865475), z_dir=(1, 0, 0)) * Sphere(FILLET5_R, mode=Mode.PRIVATE)
    add(fillet5_piece_1, mode=Mode.SUBTRACT)
    with BuildSketch(Plane(origin=(75, 115, -90), x_dir=(0, 1, 0), z_dir=(1, 0, 0))) as fillet5_piece_2_section:
        Polygon((0, 0), (FILLET5_R, 0), (FILLET5_R, -FILLET5_R), (0, -FILLET5_R), align=None)
    fillet5_piece_2 = extrude(amount=FILLET5_R, mode=Mode.PRIVATE)
    fillet5_piece_2 = fillet5_piece_2 - Plane(origin=(75, 115, -90), x_dir=(0, -0.7071067811865475, 0.7071067811865475), z_dir=(1, 0, 0)) * Sphere(FILLET5_R, mode=Mode.PRIVATE)
    add(fillet5_piece_2, mode=Mode.SUBTRACT)
    with BuildSketch(Plane(origin=(-75, 115, -90), x_dir=(0, 1, 0), z_dir=(-1, 0, 0))) as fillet5_piece_3_section:
        Polygon((0, 0), (FILLET5_R, 0), (FILLET5_R, FILLET5_R), (0, FILLET5_R), align=None)
    fillet5_piece_3 = extrude(amount=FILLET5_R, mode=Mode.PRIVATE)
    fillet5_piece_3 = fillet5_piece_3 - Plane(origin=(-75, 115, -90), x_dir=(0, -0.7071067811865475, 0.7071067811865475), z_dir=(-1, 0, 0)) * Sphere(FILLET5_R, mode=Mode.PRIVATE)
    add(fillet5_piece_3, mode=Mode.SUBTRACT)
    with BuildSketch(Plane(origin=(-75, 115, -10), x_dir=(0, 1, 0), z_dir=(-1, 0, 0))) as fillet5_piece_4_section:
        Polygon((0, 0), (FILLET5_R, 0), (FILLET5_R, -FILLET5_R), (0, -FILLET5_R), align=None)
    fillet5_piece_4 = extrude(amount=FILLET5_R, mode=Mode.PRIVATE)
    fillet5_piece_4 = fillet5_piece_4 - Plane(origin=(-75, 115, -10), x_dir=(0, -0.7071067811865475, -0.7071067811865475), z_dir=(-1, 0, 0)) * Sphere(FILLET5_R, mode=Mode.PRIVATE)
    add(fillet5_piece_4, mode=Mode.SUBTRACT)
    with BuildSketch(Plane(origin=(85, 125, -10), x_dir=(0, -1, 0), z_dir=(0, 0, -1))) as fillet5_piece_5:
        with BuildLine():
            CenterArc((FILLET5_R, FILLET5_R), FILLET5_R, 180, 90)
            Line((0, FILLET5_R), (0, 0))
            Line((0, 0), (FILLET5_R, 0))
        make_face()
    extrude(amount=80, mode=Mode.SUBTRACT)
    with BuildSketch(Plane(origin=(-85, 125, -10), x_dir=(0, -1, 0), z_dir=(0, 0, -1))) as fillet5_piece_6:
        with BuildLine():
            CenterArc((FILLET5_R, -FILLET5_R), FILLET5_R, 90, 90)
            Line((0, -FILLET5_R), (0, 0))
            Line((0, 0), (FILLET5_R, 0))
        make_face()
    extrude(amount=80, mode=Mode.SUBTRACT)

    # Sketch14 → Cut-Extrude9 (cut, through all)
    with BuildSketch(Plane(origin=(24.8, 0, 0), x_dir=(0, 0, -1), z_dir=(1, 0, 0))):
        with Locations(Location((50, 176, 0), (0, 0, 25.856016698))):
            Circle(SKETCH14_R)
    extrude(amount=-CUT_EXTRUDE9_DEPTH, mode=Mode.SUBTRACT)


with BuildPart() as body_2:
    # Sketch13 → Boss-Extrude7 (new body)
    with BuildSketch(Plane(origin=(0, 0, -100), x_dir=(-1, 0, 0), z_dir=(0, 0, -1))):
        Polygon((-25, -75), (-25, -105), (25.018802851, -105), (25, -75), align=None)
    extrude(amount=BOSS_EXTRUDE7_DEPTH)

    # Fillet4
    # the kernel refuses this fillet: 10 mm, written as the material it takes off along each edge
    with BuildSketch(Plane(origin=(-25.021013242, -108.526683302, -100.1), x_dir=(0, 0, 1), z_dir=(0.0006267615930631998, 0.9999998035849335, 0))) as fillet4_piece_1:
        with BuildLine():
            CenterArc((10, 1.410673598), FILLET4_R, 180, 8.109614456)
            Line((0, 1.410673598), (0, 0))
            Line((0, 0), (0.1, 0))
        make_face()
    extrude(amount=37.053373882, mode=Mode.SUBTRACT)
    with BuildSketch(Plane(origin=(25, -71.473316005, -100.1), x_dir=(0, 0, 1), z_dir=(0, -1, 0))) as fillet4_piece_2:
        with BuildLine():
            CenterArc((10, 1.410673598), FILLET4_R, 180, 8.109614456)
            Line((0, 1.410673598), (0, 0))
            Line((0, 0), (0.1, 0))
        make_face()
    extrude(amount=37.05336799, mode=Mode.SUBTRACT)
    with BuildSketch(Plane(origin=(28.526683995, -105, -100.1), x_dir=(0, 0, 1), z_dir=(-1, 0, 0))) as fillet4_piece_3:
        with BuildLine():
            CenterArc((10, 1.410673598), FILLET4_R, 180, 8.109614456)
            Line((0, 1.410673598), (0, 0))
            Line((0, 0), (0.1, 0))
        make_face()
    extrude(amount=57.072170841, mode=Mode.SUBTRACT)


solid = Compound([part.part, body_2.part])
